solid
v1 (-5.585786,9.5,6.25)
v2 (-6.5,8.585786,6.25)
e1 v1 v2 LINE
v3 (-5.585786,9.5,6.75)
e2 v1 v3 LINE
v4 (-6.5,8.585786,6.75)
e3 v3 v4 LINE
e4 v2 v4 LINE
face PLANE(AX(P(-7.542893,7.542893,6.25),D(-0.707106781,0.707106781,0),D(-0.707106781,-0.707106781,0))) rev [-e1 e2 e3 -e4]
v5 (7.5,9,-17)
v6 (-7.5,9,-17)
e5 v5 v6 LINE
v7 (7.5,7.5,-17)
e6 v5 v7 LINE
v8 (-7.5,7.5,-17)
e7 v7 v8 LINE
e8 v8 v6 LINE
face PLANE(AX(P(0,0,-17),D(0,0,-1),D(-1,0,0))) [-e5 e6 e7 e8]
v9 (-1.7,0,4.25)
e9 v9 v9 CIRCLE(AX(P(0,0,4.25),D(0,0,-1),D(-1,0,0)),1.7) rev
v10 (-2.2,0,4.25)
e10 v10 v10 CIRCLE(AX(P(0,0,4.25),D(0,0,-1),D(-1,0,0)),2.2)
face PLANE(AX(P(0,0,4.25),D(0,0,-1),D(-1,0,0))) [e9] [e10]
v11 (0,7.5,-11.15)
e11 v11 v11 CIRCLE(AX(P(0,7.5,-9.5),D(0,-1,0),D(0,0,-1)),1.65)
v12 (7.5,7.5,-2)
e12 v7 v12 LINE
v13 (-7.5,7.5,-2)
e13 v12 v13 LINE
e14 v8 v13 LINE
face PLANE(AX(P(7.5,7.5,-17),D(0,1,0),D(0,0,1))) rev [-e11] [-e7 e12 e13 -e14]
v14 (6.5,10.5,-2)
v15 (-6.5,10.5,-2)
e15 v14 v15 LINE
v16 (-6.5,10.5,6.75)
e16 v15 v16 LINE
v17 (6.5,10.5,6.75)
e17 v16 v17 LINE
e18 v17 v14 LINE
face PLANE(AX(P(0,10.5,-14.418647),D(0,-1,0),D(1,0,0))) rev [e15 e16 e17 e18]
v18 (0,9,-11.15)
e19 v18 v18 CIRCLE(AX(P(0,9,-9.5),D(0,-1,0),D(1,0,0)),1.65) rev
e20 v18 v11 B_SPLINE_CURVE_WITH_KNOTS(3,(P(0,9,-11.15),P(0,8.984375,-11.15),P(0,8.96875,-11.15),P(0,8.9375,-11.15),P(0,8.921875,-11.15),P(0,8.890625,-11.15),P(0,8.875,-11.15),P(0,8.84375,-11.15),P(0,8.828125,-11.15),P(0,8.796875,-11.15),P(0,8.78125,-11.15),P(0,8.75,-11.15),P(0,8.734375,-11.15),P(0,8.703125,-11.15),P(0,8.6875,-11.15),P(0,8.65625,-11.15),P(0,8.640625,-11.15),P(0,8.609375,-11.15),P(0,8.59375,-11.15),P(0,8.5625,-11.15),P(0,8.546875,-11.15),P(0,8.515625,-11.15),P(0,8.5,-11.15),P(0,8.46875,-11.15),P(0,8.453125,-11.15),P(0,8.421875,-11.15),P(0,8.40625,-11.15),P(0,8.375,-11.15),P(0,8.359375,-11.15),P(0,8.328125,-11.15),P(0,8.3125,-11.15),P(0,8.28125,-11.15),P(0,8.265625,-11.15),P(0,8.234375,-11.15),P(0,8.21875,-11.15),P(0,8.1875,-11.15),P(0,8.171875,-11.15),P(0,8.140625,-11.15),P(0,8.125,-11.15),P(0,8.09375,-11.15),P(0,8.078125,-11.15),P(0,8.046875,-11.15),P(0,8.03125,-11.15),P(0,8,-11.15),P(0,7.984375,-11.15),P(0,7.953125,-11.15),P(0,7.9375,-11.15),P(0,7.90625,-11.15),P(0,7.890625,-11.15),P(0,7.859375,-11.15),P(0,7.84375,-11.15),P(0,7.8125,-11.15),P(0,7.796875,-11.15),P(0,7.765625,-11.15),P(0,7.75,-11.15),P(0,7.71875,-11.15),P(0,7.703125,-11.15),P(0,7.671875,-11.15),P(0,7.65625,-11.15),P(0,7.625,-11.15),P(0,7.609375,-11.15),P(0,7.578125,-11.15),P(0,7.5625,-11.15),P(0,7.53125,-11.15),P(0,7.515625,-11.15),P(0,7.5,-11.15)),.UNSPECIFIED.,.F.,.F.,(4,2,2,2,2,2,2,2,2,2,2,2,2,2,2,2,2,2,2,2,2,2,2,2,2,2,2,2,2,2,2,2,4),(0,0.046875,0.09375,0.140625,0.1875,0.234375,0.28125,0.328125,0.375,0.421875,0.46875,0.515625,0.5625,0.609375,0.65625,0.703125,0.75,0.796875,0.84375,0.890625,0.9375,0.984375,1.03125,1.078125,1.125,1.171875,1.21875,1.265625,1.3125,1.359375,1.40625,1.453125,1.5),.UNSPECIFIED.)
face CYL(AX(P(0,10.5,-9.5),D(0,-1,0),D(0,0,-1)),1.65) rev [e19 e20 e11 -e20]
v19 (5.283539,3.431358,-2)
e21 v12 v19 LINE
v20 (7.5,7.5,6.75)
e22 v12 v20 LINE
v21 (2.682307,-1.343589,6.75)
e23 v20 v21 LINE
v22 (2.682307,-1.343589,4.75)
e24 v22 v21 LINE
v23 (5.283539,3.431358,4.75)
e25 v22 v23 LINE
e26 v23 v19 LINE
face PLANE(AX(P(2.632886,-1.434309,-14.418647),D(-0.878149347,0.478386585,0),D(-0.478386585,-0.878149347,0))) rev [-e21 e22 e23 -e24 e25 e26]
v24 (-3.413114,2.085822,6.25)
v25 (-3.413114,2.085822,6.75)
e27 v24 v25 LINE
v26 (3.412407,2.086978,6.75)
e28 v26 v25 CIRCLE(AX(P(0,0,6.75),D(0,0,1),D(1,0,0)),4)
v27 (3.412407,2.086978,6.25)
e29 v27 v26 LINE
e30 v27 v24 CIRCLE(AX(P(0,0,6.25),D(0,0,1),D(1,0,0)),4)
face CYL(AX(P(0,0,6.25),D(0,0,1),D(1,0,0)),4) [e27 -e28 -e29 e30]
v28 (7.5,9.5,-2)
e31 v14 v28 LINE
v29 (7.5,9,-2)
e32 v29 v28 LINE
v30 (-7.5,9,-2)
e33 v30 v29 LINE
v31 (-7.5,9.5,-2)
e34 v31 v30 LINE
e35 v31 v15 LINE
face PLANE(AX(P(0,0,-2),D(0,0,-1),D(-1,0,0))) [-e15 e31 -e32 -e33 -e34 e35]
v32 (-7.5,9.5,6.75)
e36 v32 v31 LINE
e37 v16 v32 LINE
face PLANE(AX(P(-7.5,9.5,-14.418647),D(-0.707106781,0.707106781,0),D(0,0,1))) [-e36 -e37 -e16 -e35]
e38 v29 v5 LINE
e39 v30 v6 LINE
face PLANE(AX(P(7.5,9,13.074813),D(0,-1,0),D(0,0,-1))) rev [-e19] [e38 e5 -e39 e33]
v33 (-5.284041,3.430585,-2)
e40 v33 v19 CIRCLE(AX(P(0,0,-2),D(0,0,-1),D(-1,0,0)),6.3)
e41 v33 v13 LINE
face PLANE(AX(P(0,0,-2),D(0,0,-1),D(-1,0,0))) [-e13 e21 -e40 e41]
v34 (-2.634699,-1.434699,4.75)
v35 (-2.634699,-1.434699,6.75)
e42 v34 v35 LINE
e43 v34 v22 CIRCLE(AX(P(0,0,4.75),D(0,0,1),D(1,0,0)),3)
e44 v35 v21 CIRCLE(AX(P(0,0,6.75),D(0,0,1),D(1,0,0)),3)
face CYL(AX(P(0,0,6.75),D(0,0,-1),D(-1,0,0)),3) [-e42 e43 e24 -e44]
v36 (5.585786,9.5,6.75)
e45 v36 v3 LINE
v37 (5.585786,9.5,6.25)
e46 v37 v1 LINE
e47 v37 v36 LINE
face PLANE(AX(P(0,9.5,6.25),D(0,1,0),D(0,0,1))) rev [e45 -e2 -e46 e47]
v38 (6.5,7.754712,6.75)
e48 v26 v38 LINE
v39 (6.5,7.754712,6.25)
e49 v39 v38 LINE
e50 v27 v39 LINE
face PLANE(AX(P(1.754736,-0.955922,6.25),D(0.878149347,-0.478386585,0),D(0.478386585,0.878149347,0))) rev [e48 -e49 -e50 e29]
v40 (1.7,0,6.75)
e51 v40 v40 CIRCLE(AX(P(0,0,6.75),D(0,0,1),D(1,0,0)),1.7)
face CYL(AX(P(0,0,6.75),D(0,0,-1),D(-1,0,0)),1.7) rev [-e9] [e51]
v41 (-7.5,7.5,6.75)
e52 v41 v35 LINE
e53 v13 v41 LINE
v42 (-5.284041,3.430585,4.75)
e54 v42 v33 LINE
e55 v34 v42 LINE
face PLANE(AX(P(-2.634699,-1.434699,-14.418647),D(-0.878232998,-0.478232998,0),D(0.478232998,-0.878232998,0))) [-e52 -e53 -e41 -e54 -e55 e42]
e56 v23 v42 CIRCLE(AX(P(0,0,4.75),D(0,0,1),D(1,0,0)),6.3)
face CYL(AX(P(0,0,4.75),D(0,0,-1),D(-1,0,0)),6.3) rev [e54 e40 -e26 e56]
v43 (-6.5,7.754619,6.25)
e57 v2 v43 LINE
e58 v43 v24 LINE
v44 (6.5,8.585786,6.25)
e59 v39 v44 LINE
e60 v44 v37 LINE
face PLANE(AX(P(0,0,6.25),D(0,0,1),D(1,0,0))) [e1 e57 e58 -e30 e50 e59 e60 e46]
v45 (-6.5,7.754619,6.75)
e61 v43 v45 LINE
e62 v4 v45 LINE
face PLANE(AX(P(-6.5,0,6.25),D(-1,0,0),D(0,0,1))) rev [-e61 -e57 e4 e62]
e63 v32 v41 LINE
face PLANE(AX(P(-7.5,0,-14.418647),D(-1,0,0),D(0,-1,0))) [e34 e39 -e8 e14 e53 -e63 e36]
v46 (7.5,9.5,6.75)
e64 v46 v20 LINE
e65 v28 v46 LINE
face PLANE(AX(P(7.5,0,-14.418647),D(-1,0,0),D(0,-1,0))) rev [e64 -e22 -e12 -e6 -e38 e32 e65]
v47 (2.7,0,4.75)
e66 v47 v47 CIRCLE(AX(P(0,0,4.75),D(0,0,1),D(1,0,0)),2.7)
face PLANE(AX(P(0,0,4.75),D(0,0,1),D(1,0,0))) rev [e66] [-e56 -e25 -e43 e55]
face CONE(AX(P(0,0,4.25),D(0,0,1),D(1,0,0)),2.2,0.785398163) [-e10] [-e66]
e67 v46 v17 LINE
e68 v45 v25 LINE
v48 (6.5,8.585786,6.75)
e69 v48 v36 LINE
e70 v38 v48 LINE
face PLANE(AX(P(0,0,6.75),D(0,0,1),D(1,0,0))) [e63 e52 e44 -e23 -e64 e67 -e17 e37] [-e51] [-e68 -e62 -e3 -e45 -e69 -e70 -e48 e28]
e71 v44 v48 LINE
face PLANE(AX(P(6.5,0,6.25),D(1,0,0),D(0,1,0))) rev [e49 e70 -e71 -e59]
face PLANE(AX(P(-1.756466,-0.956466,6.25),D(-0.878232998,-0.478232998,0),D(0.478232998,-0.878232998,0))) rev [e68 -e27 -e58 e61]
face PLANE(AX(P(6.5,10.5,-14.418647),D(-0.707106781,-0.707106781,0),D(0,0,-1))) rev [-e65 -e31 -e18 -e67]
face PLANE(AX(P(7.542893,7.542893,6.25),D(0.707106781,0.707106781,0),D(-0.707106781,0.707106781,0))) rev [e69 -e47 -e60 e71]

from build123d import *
from build123d.topology import SkipClean

# Parameters (mm, degrees)
BOSS_EXTRUDE1_DEPTH  = 2
BOSS_EXTRUDE2_START  = 4.75
BOSS_EXTRUDE2_DEPTH  = 4.75
BOSS_EXTRUDE3_START  = 2
SKETCH3_R            = 1.7
BOSS_EXTRUDE3_DEPTH  = 2
SKETCH4_R            = 2.2
SKETCH4_R_2          = 1.7
BOSS_EXTRUDE4_DEPTH  = 0.5
CHAMFER1_SIZE        = 0.5
SKETCH5_W            = 7.5
SKETCH5_H            = 3
BOSS_EXTRUDE5_DEPTH  = 2
BOSS_EXTRUDE6_DEPTH  = 6.75
BOSS_EXTRUDE8_DEPTH  = 6.75
SKETCH10_W           = 15
SKETCH10_H           = 3
BOSS_EXTRUDE9_DEPTH  = 15
SKETCH11_R           = 1.65
CUT_EXTRUDE1_DEPTH   = 22.34244597
FILLET1_START        = -3
FILLET1_DEPTH        = 7.75
CHAMFER6_SIZE        = 1.5
BOSS_EXTRUDE11_START = -6.75
BOSS_EXTRUDE11_DEPTH = 6.75
BOSS_EXTRUDE12_REACH = 29.029
SKETCH16_W           = 15
SKETCH16_H           = 1.5
CUT_EXTRUDE3_DEPTH   = 0.5
SKETCH17_W           = 15
SKETCH17_H           = 1.5
CUT_EXTRUDE4_DEPTH   = 15
CHAMFER8_SIZE        = 1


with BuildPart() as part:
    # Sketch1 → Boss-Extrude1 (new body)
    with BuildSketch(Plane.XY):
        with BuildLine():
            Line((4.594082841, 4.876925553), (5.159993549, 5.442836262))
            ThreePointArc((5.159993549, 5.442836262), (0, 7.5), (-5.159993549, 5.442836262))
            Line((-5.159993549, 5.442836262), (-4.594082841, 4.876925553))
            ThreePointArc((-4.594082841, 4.876925553), (0, 6.7), (4.594082841, 4.876925553))
        make_face()
    extrude(amount=-BOSS_EXTRUDE1_DEPTH)

    # Sketch1<3> → Boss-Extrude2 (add)
    with BuildSketch(Plane.XY.offset(BOSS_EXTRUDE2_START)):
        with BuildLine():
            Line((4.594082841, 4.876925553), (5.159993549, 5.442836262))
            ThreePointArc((5.159993549, 5.442836262), (0, 7.5), (-5.159993549, 5.442836262))
            Line((-5.159993549, 5.442836262), (-4.594082841, 4.876925553))
            ThreePointArc((-4.594082841, 4.876925553), (0, 6.7), (4.594082841, 4.876925553))
        make_face()
        with BuildLine():
            Line((4.454772721, 4.454772721), (4.596194078, 4.596194078))
            Line((4.596194078, 4.596194078), (5.303300859, 5.303300859))
            ThreePointArc((5.303300859, 5.303300859), (5.232112384, 5.373546315), (5.159993549, 5.442836262))
            Line((5.159993549, 5.442836262), (4.594082841, 4.876925553))
            ThreePointArc((4.594082841, 4.876925553), (0, 6.7), (-4.594082841, 4.876925553))
            Line((-4.594082841, 4.876925553), (-5.159993549, 5.442836262))
            ThreePointArc((-5.159993549, 5.442836262), (-5.232112384, 5.373546315), (-5.303300859, 5.303300859))
            Line((-5.303300859, 5.303300859), (-4.596194078, 4.596194078))
            Line((-4.596194078, 4.596194078), (-4.454772721, 4.454772721))
            ThreePointArc((-4.454772721, 4.454772721), (0, 6.3), (4.454772721, 4.454772721))
        make_face()
    extrude(amount=-BOSS_EXTRUDE2_DEPTH)

    # Sketch3 → Boss-Extrude3 (add)
    with BuildSketch(Plane.XY.offset(4.75).offset(BOSS_EXTRUDE3_START)):
        with BuildLine():
            ThreePointArc((5.303300859, 5.303300859), (0, 7.5), (-5.303300859, 5.303300859))
            Line((-5.303300859, 5.303300859), (-2.792750347, -1.095694072))
            ThreePointArc((-2.792750347, -1.095694072), (0, -3), (2.792750347, -1.095694072))
            Line((2.792750347, -1.095694072), (5.303300859, 5.303300859))
        make_face()
        Circle(SKETCH3_R, mode=Mode.SUBTRACT)
    extrude(amount=-BOSS_EXTRUDE3_DEPTH)

    # Sketch4 → Boss-Extrude4 (add)
    with SkipClean():  # the faces are left unmerged after this step: merging them gives an invalid solid
        with BuildSketch(Plane(origin=(0, 0, 4.75), x_dir=(-1, 0, 0), z_dir=(0, 0, -1))):
            with Locations(Location((0, 0, 0), (0, 0, 180))):
                Circle(SKETCH4_R)
            Circle(SKETCH4_R_2, mode=Mode.SUBTRACT)
        extrude(amount=BOSS_EXTRUDE4_DEPTH)
    add(part.part.scale(1), mode=Mode.REPLACE)  # the faces are merged on a copy

    # Chamfer1
    chamfer1_edges = [part.edges().sort_by_distance(p)[0] for p in [
        (-2.2, 0, 4.75),
    ]]
    chamfer(chamfer1_edges, length=CHAMFER1_SIZE - 0.0001)  # a hair under: the kernel refuses the full size

    # Sketch5 → Boss-Extrude5 (add)
    with BuildSketch(Plane.XY.offset(6.75)):
        with BuildLine():
            ThreePointArc((-5.303300859, 5.303300859), (-2.870125743, 6.929096494), (0, 7.5))
            Line((0, 7.5), (-7.5, 7.5))
            Line((-7.5, 7.5), (-2.634698995, -1.434698995))
            ThreePointArc((-2.634698995, -1.434698995), (-2.71901318, -1.26766215), (-2.792750347, -1.095694072))
            Line((-2.792750347, -1.095694072), (-5.303300859, 5.303300859))
        make_face()
        with Locations((-3.75, 9)):
            Rectangle(SKETCH5_W, SKETCH5_H)
        with Locations((3.75, 9)):
            Rectangle(SKETCH5_W, SKETCH5_H)
        with BuildLine():
            Line((7.5, 7.5), (0, 7.5))
            ThreePointArc((0, 7.5), (2.870125743, 6.929096494), (5.303300859, 5.303300859))
            Line((5.303300859, 5.303300859), (2.792750347, -1.095694072))
            ThreePointArc((2.792750347, -1.095694072), (2.740333064, -1.220890945), (2.682306676, -1.343588812))
            Line((2.682306676, -1.343588812), (7.5, 7.5))
        make_face()
    extrude(amount=-BOSS_EXTRUDE5_DEPTH)

    # Sketch6 → Boss-Extrude6 (add)
    with BuildSketch(Plane(origin=(0, 0, 4.75), x_dir=(-1, 0, 0), z_dir=(0, 0, -1))):
        with BuildLine():
            Line((-5.921621025, 4.602651891), (-5.499242594, 3.827313795))
            ThreePointArc((-5.499242594, 3.827313795), (-5.138626065, 4.299362995), (-4.737615434, 4.737615434))
            Line((-4.737615434, 4.737615434), (-5.303300859, 5.303300859))
            ThreePointArc((-5.303300859, 5.303300859), (-5.623383774, 4.962615735), (-5.921621025, 4.602651891))
        make_face()
        with BuildLine():
            ThreePointArc((4.737615434, 4.737615434), (5.13888851, 4.2990493), (5.499709828, 3.826642367))
            Line((5.499709828, 3.826642367), (5.922007367, 4.602154794))
            ThreePointArc((5.922007367, 4.602154794), (5.623592059, 4.962379707), (5.303300859, 5.303300859))
            Line((5.303300859, 5.303300859), (4.737615434, 4.737615434))
        make_face()
    extrude(amount=BOSS_EXTRUDE6_DEPTH)

    # Sketch8 → Boss-Extrude8 (add)
    with BuildSketch(Plane(origin=(0, 0, 4.75), x_dir=(-1, 0, 0), z_dir=(0, 0, -1))):
        with BuildLine():
            Line((5.922007367, 4.602154794), (7.5, 7.5))
            Line((7.5, 7.5), (7.5, 10.5))
            Line((7.5, 10.5), (-7.5, 10.5))
            Line((-7.5, 10.5), (-7.5, 7.5))
            Line((-7.5, 7.5), (-5.921621025, 4.602651891))
            ThreePointArc((-5.921621025, 4.602651891), (0.000314788, 7.499999993), (5.922007367, 4.602154794))
        make_face()
    extrude(amount=BOSS_EXTRUDE8_DEPTH)

    # Sketch10 → Boss-Extrude9 (add)
    with BuildSketch(Plane(origin=(0, 0, -2), x_dir=(-1, 0, 0), z_dir=(0, 0, -1))):
        with Locations((0, 9)):
            Rectangle(SKETCH10_W, SKETCH10_H)
    extrude(amount=BOSS_EXTRUDE9_DEPTH)

    # Sketch11 → Cut-Extrude1 (cut, through all)
    with BuildSketch(Plane.XZ.offset(-7.5)):
        with Locations(Location((0, -9.5, 0), (0, 0, 270))):
            Circle(SKETCH11_R)
    extrude(amount=-CUT_EXTRUDE1_DEPTH, mode=Mode.SUBTRACT)

    # Fillet1: read off the stored shape, not the designer's step
    # Fillet1 outline → Fillet1 (cut)
    with BuildSketch(Plane.XY.offset(FILLET1_START)):
        with BuildLine():
            ThreePointArc((-5.316260804, 4.077667356), (-5.490505676, 3.999994233), (-5.650601756, 4.10374217))
            Line((-5.650601756, 4.10374217), (-5.499709828, 3.826642367))
            ThreePointArc((-5.499709828, 3.826642367), (-5.409441613, 3.953219123), (-5.316260804, 4.077667356))
        make_face()
        with BuildLine():
            ThreePointArc((5.650134675, 4.104298532), (5.49004858, 4.000580786), (5.315823507, 4.078237419))
            ThreePointArc((5.315823507, 4.078237419), (5.408988293, 3.953839354), (5.499242594, 3.827313795))
            Line((5.499242594, 3.827313795), (5.650134675, 4.104298532))
        make_face()
    extrude(amount=FILLET1_DEPTH, mode=Mode.SUBTRACT)

    # Chamfer6
    chamfer6_edges = [part.edges().sort_by_distance(p)[0] for p in [
        (7.5, 10.5, -5.125),
        (-7.5, 10.5, -5.125),
    ]]
    chamfer(chamfer6_edges, length=CHAMFER6_SIZE)

    # Sketch12 → Boss-Extrude11 (add)
    with BuildSketch(Plane(origin=(0, 0, -2), x_dir=(-1, 0, 0), z_dir=(0, 0, -1)).offset(BOSS_EXTRUDE11_START)):
        with BuildLine():
            Line((-5.303300859, 5.303300859), (-5.210007514, 5.210007514))
            ThreePointArc((-5.210007514, 5.210007514), (-5.138810365, 5.280244751), (-5.066666421, 5.349509134))
            Line((-5.066666421, 5.349509134), (-5.159993549, 5.442836262))
            ThreePointArc((-5.159993549, 5.442836262), (-5.232112384, 5.373546315), (-5.303300859, 5.303300859))
        make_face()
        with BuildLine():
            ThreePointArc((-5.315823507, 4.078237419), (-5.49004858, 4.000580786), (-5.650134675, 4.104298532))
            Line((-5.650134675, 4.104298532), (-5.283538928, 3.431357806))
            ThreePointArc((-5.283538928, 3.431357806), (0.000460722, 6.299999983), (5.284040746, 3.430584993))
            Line((5.284040746, 3.430584993), (5.650601756, 4.10374217))
            ThreePointArc((5.650601756, 4.10374217), (5.490505675, 3.999994233), (5.316260804, 4.077667356))
            ThreePointArc((5.316260804, 4.077667356), (5.037756417, 4.417126926), (4.737615434, 4.737615434))
            Line((4.737615434, 4.737615434), (5.210007514, 5.210007514))
            ThreePointArc((5.210007514, 5.210007514), (5.138810365, 5.280244751), (5.066666421, 5.349509134))
            Line((5.066666421, 5.349509134), (4.594082841, 4.876925553))
            ThreePointArc((4.594082841, 4.876925553), (0, 6.7), (-4.594082841, 4.876925553))
            Line((-4.594082841, 4.876925553), (-5.066666421, 5.349509134))
            ThreePointArc((-5.066666421, 5.349509134), (-5.138810365, 5.280244751), (-5.210007514, 5.210007514))
            Line((-5.210007514, 5.210007514), (-4.737615434, 4.737615434))
            ThreePointArc((-4.737615434, 4.737615434), (-5.037519576, 4.41739703), (-5.315823507, 4.078237419))
        make_face()
        with BuildLine():
            Line((-5.85264511, 4.476036395), (-5.650134675, 4.104298532))
            ThreePointArc((-5.650134675, 4.104298532), (-5.49004858, 4.000580786), (-5.315823507, 4.078237419))
            ThreePointArc((-5.315823507, 4.078237419), (-5.037519576, 4.41739703), (-4.737615434, 4.737615434))
            Line((-4.737615434, 4.737615434), (-5.210007514, 5.210007514))
            ThreePointArc((-5.210007514, 5.210007514), (-5.543487095, 4.85366948), (-5.85264511, 4.476036395))
        make_face()
        with BuildLine():
            Line((5.159993549, 5.442836262), (5.066666421, 5.349509134))
            ThreePointArc((5.066666421, 5.349509134), (5.138810365, 5.280244751), (5.210007514, 5.210007514))
            Line((5.210007514, 5.210007514), (5.303300859, 5.303300859))
            ThreePointArc((5.303300859, 5.303300859), (5.232112384, 5.373546315), (5.159993549, 5.442836262))
        make_face()
        with BuildLine():
            ThreePointArc((5.316260804, 4.077667356), (5.490505675, 3.999994233), (5.650601756, 4.10374217))
            Line((5.650601756, 4.10374217), (5.853045643, 4.47551263))
            ThreePointArc((5.853045643, 4.47551263), (5.543704265, 4.853421435), (5.210007514, 5.210007514))
            Line((5.210007514, 5.210007514), (4.737615434, 4.737615434))
            ThreePointArc((4.737615434, 4.737615434), (5.037756417, 4.417126926), (5.316260804, 4.077667356))
        make_face()
    extrude(amount=BOSS_EXTRUDE11_DEPTH)

    # Boss-Extrude12: up to this face of the body (flat: up to its plane)
    boss_extrude12_end = Plane(part.part.faces().sort_by_distance((-0.00029363, 5.45528482, 6.75))[0])
    # Sketch16 → Boss-Extrude12 (add, up to the picked face)
    with BuildSketch(Plane(origin=(0, 0, -17), x_dir=(-1, 0, 0), z_dir=(0, 0, -1)), mode=Mode.PRIVATE) as boss_extrude12_sk1:
        with Locations((0, 9.75)):
            Rectangle(SKETCH16_W, SKETCH16_H)
    boss_extrude12_tool1 = split(extrude(boss_extrude12_sk1.sketch, amount=-BOSS_EXTRUDE12_REACH, mode=Mode.PRIVATE), bisect_by=boss_extrude12_end, keep=Keep.BOTH, mode=Mode.PRIVATE)
    add(boss_extrude12_tool1.solids().sort_by(Axis((0, 9.75, -17), (0, 0, 1)))[0])

    # Sketch13 → Cut-Extrude3 (cut)
    with BuildSketch(Plane.XY.offset(6.75)):
        with BuildLine():
            ThreePointArc((3.4124071, 2.086978147), (-0.000677338, 3.999999943), (-3.413113698, 2.085822351))
            Line((-3.413113698, 2.085822351), (-6.5, 7.754618569))
            Line((-6.5, 7.754618569), (-6.5, 8.585786438))
            Line((-6.5, 8.585786438), (-5.585786438, 9.5))
            Line((-5.585786438, 9.5), (5.585786438, 9.5))
            Line((5.585786438, 9.5), (6.5, 8.585786438))
            Line((6.5, 8.585786438), (6.5, 7.754711685))
            Line((6.5, 7.754711685), (3.4124071, 2.086978147))
        make_face()
    extrude(amount=-CUT_EXTRUDE3_DEPTH, mode=Mode.SUBTRACT)

    # Sketch17 → Cut-Extrude4 (cut)
    with BuildSketch(Plane(origin=(0, 0, -17), x_dir=(-1, 0, 0), z_dir=(0, 0, -1))):
        with Locations((0, 9.75)):
            Rectangle(SKETCH17_W, SKETCH17_H)
    extrude(amount=-CUT_EXTRUDE4_DEPTH, mode=Mode.SUBTRACT)

    # Chamfer8
    chamfer8_edges = [part.edges().sort_by_distance(p)[0] for p in [
        (7.5, 10.5, 2.375),
        (-7.5, 10.5, 2.375),
    ]]
    chamfer(chamfer8_edges, length=CHAMFER8_SIZE)


solid = part.part
